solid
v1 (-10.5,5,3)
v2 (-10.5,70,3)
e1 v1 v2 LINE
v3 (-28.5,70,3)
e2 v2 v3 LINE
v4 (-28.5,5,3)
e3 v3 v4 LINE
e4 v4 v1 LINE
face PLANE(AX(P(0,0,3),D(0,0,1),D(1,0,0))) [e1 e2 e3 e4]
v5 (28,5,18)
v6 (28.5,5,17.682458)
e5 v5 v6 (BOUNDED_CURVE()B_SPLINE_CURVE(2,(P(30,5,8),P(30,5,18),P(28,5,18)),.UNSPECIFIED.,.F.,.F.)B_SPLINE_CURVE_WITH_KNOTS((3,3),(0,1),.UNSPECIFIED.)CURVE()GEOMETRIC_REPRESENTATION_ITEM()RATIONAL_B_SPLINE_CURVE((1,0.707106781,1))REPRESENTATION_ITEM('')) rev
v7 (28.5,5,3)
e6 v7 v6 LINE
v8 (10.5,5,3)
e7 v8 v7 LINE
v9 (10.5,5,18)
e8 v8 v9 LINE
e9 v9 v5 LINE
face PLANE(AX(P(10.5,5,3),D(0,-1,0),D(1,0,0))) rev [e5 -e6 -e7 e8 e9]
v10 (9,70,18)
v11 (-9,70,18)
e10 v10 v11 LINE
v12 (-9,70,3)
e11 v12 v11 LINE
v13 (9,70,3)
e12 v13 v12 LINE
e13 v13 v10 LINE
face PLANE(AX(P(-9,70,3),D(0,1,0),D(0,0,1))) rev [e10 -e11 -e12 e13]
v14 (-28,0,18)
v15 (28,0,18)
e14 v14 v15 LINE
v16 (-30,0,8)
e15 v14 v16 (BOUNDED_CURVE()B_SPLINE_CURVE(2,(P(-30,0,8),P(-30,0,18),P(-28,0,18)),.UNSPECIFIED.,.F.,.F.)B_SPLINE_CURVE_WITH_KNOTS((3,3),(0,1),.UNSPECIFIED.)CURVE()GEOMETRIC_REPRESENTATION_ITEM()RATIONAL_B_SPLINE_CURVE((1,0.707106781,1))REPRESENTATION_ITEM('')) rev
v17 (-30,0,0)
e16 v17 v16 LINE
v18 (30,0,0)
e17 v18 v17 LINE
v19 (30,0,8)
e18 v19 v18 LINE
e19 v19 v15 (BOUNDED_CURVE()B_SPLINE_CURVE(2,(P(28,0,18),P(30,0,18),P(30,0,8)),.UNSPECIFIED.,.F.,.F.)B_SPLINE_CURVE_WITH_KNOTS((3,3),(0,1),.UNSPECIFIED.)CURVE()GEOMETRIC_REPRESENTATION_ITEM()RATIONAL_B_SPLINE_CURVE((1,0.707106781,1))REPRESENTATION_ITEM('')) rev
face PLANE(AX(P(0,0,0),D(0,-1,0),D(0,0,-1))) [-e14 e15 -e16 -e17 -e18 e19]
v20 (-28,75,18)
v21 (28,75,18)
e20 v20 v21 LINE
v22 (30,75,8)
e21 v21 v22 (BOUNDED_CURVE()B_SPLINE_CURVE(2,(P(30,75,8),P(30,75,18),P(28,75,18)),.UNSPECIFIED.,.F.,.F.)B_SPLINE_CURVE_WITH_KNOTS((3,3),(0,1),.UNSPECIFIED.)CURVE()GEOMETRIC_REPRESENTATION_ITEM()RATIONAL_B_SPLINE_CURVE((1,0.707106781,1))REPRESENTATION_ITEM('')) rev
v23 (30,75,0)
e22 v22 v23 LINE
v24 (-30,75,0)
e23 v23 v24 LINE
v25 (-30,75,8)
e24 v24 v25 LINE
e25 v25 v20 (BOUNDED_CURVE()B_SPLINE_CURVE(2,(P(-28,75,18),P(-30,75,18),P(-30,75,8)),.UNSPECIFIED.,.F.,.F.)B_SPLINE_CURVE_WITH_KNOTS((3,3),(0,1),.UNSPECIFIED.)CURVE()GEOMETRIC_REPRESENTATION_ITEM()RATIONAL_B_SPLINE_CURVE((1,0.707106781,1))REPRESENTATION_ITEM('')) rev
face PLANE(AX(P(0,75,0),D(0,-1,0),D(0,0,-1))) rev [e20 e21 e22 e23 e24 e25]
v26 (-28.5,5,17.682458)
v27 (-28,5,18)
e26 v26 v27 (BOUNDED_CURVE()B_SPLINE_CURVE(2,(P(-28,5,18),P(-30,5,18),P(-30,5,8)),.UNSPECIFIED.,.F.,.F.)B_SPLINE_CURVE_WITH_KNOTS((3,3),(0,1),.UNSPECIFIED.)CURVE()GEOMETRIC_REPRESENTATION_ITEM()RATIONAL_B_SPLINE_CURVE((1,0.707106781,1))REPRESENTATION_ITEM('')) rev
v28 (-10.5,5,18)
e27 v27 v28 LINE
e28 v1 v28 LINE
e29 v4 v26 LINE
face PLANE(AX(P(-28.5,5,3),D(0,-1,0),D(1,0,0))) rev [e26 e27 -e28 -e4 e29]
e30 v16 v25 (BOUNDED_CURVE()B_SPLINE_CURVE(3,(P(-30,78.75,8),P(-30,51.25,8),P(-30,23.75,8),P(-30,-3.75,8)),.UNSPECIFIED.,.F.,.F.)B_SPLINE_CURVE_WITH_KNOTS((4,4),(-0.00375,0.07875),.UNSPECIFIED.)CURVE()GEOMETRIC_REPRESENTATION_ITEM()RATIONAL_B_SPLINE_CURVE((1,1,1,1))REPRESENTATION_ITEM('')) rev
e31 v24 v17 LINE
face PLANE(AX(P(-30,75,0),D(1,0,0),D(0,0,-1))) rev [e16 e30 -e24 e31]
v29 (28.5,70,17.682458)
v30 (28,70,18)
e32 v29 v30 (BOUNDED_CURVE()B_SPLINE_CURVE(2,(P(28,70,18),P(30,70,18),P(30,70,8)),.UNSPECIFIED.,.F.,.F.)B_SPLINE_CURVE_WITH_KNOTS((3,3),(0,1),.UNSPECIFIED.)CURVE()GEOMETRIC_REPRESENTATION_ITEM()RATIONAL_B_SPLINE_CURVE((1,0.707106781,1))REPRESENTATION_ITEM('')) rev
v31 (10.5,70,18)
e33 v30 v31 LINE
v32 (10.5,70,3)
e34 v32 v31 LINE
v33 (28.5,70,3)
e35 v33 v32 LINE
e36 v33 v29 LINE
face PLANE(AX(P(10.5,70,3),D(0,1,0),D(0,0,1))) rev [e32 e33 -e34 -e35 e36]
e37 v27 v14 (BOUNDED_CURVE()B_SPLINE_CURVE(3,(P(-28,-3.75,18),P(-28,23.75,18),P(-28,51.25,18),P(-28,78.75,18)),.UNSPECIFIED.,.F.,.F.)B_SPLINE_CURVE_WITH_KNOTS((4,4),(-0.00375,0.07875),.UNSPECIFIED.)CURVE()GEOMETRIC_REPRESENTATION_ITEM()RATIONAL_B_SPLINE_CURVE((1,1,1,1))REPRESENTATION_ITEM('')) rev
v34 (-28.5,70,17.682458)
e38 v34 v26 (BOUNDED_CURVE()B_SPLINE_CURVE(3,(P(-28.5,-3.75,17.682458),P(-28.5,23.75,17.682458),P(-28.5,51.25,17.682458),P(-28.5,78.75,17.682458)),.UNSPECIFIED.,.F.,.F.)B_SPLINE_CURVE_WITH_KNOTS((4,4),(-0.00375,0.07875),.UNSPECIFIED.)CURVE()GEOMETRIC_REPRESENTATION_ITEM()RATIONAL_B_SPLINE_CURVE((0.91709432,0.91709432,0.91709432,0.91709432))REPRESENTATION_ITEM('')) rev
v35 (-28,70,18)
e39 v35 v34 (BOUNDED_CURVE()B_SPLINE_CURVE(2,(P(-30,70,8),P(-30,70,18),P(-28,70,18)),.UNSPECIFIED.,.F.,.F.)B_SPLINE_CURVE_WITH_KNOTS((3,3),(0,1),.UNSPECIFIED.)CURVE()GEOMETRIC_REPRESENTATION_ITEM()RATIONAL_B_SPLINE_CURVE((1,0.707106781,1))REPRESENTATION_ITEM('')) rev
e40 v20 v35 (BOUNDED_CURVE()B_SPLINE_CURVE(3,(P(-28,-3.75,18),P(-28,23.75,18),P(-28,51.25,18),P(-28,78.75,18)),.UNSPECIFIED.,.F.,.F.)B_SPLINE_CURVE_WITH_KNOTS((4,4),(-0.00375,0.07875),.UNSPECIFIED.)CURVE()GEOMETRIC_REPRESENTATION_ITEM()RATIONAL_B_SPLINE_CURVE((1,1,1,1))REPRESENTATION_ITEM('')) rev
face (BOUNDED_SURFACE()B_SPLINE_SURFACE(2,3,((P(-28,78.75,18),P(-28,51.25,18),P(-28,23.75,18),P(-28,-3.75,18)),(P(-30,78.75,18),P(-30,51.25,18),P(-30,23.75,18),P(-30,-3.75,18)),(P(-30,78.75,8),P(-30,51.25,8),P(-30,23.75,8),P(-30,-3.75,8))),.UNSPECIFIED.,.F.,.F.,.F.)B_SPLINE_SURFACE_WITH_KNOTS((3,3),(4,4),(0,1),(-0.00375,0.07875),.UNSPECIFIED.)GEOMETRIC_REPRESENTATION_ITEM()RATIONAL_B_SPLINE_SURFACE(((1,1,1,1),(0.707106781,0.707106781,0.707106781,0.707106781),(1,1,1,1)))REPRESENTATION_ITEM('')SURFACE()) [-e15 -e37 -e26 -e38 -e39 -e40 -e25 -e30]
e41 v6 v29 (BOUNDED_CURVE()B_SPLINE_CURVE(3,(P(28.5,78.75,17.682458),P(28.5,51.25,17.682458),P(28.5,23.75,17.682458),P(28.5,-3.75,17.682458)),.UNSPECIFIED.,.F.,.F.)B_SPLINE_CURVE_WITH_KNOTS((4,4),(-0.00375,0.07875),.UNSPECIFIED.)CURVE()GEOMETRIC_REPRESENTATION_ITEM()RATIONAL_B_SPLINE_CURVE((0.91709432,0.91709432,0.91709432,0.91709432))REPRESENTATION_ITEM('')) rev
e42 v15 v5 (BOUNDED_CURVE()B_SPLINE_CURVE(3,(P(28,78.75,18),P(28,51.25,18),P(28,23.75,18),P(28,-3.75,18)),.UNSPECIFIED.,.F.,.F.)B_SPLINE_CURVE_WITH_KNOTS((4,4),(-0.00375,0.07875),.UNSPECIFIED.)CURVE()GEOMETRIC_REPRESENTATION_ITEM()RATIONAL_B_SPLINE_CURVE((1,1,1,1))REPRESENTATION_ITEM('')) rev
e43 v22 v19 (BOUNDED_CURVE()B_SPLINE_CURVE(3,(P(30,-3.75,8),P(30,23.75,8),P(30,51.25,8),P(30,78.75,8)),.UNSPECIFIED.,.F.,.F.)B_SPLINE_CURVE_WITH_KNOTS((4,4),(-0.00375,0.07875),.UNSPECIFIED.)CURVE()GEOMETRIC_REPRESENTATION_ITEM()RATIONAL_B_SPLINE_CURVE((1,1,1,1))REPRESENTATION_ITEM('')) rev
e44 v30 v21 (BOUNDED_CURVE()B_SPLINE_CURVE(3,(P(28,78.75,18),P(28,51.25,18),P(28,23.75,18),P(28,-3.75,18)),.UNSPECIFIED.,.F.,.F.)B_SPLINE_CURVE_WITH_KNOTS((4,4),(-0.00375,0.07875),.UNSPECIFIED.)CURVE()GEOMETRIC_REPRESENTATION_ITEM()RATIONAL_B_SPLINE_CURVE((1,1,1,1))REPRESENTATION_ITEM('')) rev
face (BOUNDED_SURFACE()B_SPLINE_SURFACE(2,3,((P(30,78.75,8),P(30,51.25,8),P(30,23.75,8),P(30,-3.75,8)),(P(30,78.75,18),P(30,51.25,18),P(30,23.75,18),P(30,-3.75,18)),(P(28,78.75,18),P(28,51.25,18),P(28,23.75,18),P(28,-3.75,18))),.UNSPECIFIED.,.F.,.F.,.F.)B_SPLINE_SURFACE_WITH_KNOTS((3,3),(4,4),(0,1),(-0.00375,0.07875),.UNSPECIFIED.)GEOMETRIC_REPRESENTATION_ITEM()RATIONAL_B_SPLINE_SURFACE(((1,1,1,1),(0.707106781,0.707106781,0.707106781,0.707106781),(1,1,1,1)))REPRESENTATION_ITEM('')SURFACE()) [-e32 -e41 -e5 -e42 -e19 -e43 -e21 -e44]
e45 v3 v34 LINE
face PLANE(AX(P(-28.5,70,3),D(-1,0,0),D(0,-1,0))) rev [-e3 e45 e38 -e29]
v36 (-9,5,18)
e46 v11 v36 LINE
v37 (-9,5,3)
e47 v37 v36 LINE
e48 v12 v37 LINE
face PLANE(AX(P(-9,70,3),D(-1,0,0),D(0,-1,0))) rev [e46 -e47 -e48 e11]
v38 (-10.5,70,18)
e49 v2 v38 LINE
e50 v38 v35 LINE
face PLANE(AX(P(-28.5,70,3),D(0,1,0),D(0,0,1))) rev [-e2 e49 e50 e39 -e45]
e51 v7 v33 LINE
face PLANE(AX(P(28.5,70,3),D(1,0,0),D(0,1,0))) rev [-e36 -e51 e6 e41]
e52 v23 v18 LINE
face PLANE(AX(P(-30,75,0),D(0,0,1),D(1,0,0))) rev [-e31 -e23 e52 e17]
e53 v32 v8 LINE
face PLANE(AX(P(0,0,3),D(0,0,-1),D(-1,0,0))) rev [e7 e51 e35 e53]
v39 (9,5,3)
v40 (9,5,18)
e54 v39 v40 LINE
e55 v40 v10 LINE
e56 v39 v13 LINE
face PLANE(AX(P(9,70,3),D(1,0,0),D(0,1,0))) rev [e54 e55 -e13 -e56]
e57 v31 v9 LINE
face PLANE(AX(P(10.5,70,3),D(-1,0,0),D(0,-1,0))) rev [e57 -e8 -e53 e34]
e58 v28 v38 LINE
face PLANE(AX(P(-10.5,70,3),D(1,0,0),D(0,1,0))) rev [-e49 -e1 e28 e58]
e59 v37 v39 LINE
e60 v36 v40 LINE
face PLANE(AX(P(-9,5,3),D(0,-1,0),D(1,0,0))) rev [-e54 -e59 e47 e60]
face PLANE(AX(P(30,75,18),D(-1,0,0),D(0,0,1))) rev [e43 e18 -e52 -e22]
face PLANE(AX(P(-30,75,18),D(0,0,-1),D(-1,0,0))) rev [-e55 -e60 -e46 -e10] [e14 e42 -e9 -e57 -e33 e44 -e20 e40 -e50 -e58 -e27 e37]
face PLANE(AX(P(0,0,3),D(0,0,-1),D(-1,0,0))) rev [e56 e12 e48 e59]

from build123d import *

# Parameters (mm, degrees)
SKETCH1_W           = 60
SKETCH1_H           = 18
BOSS_EXTRUDE1_DEPTH = 75
SKETCH2_W           = 18
SKETCH2_H           = 65
CUT_EXTRUDE1_DEPTH  = 15
FILLET1_SIZE        = 10
FILLET1_SIZE_2      = 2


with BuildPart() as part:
    # Sketch1 → Boss-Extrude1 (new body)
    with BuildSketch(Plane(origin=(0, 0, 0), x_dir=(1, 0, 0), z_dir=(0, 1, 0))):
        with Locations((0, -9)):
            Rectangle(SKETCH1_W, SKETCH1_H)
    extrude(amount=BOSS_EXTRUDE1_DEPTH)

    # Sketch2 → Cut-Extrude1 (cut)
    with BuildSketch(Plane.XY.offset(18)):
        with Locations((-19.5, 37.5)):
            Rectangle(SKETCH2_W, SKETCH2_H)
        with Locations((0, 37.5)):
            Rectangle(SKETCH2_W, SKETCH2_H)
        with Locations((19.5, 37.5)):
            Rectangle(SKETCH2_W, SKETCH2_H)
    extrude(amount=-CUT_EXTRUDE1_DEPTH, mode=Mode.SUBTRACT)

    # Fillet1
    # an asymmetric fillet: 10, 2 mm, written as the material it takes off along each edge
    with BuildSketch(Plane(origin=(-30, -25, 18), x_dir=(0, 0, -1), z_dir=(0, 1, 0))) as fillet1_piece_1:
        with BuildLine():
            Bezier((FILLET1_SIZE, 0), (0, 0), (0, -FILLET1_SIZE_2), weights=[1, 0.707106781, 1])
            Line((0, -FILLET1_SIZE_2), (0, 0))
            Line((0, 0), (FILLET1_SIZE, 0))
        make_face()
    extrude(amount=125, mode=Mode.SUBTRACT)
    with BuildSketch(Plane(origin=(30, -25, 18), x_dir=(0, 0, -1), z_dir=(0, 1, 0))) as fillet1_piece_2:
        with BuildLine():
            Bezier((FILLET1_SIZE, 0), (0, 0), (0, FILLET1_SIZE_2), weights=[1, 0.707106781, 1])
            Line((0, FILLET1_SIZE_2), (0, 0))
            Line((0, 0), (FILLET1_SIZE, 0))
        make_face()
    extrude(amount=125, mode=Mode.SUBTRACT)


solid = part.part
